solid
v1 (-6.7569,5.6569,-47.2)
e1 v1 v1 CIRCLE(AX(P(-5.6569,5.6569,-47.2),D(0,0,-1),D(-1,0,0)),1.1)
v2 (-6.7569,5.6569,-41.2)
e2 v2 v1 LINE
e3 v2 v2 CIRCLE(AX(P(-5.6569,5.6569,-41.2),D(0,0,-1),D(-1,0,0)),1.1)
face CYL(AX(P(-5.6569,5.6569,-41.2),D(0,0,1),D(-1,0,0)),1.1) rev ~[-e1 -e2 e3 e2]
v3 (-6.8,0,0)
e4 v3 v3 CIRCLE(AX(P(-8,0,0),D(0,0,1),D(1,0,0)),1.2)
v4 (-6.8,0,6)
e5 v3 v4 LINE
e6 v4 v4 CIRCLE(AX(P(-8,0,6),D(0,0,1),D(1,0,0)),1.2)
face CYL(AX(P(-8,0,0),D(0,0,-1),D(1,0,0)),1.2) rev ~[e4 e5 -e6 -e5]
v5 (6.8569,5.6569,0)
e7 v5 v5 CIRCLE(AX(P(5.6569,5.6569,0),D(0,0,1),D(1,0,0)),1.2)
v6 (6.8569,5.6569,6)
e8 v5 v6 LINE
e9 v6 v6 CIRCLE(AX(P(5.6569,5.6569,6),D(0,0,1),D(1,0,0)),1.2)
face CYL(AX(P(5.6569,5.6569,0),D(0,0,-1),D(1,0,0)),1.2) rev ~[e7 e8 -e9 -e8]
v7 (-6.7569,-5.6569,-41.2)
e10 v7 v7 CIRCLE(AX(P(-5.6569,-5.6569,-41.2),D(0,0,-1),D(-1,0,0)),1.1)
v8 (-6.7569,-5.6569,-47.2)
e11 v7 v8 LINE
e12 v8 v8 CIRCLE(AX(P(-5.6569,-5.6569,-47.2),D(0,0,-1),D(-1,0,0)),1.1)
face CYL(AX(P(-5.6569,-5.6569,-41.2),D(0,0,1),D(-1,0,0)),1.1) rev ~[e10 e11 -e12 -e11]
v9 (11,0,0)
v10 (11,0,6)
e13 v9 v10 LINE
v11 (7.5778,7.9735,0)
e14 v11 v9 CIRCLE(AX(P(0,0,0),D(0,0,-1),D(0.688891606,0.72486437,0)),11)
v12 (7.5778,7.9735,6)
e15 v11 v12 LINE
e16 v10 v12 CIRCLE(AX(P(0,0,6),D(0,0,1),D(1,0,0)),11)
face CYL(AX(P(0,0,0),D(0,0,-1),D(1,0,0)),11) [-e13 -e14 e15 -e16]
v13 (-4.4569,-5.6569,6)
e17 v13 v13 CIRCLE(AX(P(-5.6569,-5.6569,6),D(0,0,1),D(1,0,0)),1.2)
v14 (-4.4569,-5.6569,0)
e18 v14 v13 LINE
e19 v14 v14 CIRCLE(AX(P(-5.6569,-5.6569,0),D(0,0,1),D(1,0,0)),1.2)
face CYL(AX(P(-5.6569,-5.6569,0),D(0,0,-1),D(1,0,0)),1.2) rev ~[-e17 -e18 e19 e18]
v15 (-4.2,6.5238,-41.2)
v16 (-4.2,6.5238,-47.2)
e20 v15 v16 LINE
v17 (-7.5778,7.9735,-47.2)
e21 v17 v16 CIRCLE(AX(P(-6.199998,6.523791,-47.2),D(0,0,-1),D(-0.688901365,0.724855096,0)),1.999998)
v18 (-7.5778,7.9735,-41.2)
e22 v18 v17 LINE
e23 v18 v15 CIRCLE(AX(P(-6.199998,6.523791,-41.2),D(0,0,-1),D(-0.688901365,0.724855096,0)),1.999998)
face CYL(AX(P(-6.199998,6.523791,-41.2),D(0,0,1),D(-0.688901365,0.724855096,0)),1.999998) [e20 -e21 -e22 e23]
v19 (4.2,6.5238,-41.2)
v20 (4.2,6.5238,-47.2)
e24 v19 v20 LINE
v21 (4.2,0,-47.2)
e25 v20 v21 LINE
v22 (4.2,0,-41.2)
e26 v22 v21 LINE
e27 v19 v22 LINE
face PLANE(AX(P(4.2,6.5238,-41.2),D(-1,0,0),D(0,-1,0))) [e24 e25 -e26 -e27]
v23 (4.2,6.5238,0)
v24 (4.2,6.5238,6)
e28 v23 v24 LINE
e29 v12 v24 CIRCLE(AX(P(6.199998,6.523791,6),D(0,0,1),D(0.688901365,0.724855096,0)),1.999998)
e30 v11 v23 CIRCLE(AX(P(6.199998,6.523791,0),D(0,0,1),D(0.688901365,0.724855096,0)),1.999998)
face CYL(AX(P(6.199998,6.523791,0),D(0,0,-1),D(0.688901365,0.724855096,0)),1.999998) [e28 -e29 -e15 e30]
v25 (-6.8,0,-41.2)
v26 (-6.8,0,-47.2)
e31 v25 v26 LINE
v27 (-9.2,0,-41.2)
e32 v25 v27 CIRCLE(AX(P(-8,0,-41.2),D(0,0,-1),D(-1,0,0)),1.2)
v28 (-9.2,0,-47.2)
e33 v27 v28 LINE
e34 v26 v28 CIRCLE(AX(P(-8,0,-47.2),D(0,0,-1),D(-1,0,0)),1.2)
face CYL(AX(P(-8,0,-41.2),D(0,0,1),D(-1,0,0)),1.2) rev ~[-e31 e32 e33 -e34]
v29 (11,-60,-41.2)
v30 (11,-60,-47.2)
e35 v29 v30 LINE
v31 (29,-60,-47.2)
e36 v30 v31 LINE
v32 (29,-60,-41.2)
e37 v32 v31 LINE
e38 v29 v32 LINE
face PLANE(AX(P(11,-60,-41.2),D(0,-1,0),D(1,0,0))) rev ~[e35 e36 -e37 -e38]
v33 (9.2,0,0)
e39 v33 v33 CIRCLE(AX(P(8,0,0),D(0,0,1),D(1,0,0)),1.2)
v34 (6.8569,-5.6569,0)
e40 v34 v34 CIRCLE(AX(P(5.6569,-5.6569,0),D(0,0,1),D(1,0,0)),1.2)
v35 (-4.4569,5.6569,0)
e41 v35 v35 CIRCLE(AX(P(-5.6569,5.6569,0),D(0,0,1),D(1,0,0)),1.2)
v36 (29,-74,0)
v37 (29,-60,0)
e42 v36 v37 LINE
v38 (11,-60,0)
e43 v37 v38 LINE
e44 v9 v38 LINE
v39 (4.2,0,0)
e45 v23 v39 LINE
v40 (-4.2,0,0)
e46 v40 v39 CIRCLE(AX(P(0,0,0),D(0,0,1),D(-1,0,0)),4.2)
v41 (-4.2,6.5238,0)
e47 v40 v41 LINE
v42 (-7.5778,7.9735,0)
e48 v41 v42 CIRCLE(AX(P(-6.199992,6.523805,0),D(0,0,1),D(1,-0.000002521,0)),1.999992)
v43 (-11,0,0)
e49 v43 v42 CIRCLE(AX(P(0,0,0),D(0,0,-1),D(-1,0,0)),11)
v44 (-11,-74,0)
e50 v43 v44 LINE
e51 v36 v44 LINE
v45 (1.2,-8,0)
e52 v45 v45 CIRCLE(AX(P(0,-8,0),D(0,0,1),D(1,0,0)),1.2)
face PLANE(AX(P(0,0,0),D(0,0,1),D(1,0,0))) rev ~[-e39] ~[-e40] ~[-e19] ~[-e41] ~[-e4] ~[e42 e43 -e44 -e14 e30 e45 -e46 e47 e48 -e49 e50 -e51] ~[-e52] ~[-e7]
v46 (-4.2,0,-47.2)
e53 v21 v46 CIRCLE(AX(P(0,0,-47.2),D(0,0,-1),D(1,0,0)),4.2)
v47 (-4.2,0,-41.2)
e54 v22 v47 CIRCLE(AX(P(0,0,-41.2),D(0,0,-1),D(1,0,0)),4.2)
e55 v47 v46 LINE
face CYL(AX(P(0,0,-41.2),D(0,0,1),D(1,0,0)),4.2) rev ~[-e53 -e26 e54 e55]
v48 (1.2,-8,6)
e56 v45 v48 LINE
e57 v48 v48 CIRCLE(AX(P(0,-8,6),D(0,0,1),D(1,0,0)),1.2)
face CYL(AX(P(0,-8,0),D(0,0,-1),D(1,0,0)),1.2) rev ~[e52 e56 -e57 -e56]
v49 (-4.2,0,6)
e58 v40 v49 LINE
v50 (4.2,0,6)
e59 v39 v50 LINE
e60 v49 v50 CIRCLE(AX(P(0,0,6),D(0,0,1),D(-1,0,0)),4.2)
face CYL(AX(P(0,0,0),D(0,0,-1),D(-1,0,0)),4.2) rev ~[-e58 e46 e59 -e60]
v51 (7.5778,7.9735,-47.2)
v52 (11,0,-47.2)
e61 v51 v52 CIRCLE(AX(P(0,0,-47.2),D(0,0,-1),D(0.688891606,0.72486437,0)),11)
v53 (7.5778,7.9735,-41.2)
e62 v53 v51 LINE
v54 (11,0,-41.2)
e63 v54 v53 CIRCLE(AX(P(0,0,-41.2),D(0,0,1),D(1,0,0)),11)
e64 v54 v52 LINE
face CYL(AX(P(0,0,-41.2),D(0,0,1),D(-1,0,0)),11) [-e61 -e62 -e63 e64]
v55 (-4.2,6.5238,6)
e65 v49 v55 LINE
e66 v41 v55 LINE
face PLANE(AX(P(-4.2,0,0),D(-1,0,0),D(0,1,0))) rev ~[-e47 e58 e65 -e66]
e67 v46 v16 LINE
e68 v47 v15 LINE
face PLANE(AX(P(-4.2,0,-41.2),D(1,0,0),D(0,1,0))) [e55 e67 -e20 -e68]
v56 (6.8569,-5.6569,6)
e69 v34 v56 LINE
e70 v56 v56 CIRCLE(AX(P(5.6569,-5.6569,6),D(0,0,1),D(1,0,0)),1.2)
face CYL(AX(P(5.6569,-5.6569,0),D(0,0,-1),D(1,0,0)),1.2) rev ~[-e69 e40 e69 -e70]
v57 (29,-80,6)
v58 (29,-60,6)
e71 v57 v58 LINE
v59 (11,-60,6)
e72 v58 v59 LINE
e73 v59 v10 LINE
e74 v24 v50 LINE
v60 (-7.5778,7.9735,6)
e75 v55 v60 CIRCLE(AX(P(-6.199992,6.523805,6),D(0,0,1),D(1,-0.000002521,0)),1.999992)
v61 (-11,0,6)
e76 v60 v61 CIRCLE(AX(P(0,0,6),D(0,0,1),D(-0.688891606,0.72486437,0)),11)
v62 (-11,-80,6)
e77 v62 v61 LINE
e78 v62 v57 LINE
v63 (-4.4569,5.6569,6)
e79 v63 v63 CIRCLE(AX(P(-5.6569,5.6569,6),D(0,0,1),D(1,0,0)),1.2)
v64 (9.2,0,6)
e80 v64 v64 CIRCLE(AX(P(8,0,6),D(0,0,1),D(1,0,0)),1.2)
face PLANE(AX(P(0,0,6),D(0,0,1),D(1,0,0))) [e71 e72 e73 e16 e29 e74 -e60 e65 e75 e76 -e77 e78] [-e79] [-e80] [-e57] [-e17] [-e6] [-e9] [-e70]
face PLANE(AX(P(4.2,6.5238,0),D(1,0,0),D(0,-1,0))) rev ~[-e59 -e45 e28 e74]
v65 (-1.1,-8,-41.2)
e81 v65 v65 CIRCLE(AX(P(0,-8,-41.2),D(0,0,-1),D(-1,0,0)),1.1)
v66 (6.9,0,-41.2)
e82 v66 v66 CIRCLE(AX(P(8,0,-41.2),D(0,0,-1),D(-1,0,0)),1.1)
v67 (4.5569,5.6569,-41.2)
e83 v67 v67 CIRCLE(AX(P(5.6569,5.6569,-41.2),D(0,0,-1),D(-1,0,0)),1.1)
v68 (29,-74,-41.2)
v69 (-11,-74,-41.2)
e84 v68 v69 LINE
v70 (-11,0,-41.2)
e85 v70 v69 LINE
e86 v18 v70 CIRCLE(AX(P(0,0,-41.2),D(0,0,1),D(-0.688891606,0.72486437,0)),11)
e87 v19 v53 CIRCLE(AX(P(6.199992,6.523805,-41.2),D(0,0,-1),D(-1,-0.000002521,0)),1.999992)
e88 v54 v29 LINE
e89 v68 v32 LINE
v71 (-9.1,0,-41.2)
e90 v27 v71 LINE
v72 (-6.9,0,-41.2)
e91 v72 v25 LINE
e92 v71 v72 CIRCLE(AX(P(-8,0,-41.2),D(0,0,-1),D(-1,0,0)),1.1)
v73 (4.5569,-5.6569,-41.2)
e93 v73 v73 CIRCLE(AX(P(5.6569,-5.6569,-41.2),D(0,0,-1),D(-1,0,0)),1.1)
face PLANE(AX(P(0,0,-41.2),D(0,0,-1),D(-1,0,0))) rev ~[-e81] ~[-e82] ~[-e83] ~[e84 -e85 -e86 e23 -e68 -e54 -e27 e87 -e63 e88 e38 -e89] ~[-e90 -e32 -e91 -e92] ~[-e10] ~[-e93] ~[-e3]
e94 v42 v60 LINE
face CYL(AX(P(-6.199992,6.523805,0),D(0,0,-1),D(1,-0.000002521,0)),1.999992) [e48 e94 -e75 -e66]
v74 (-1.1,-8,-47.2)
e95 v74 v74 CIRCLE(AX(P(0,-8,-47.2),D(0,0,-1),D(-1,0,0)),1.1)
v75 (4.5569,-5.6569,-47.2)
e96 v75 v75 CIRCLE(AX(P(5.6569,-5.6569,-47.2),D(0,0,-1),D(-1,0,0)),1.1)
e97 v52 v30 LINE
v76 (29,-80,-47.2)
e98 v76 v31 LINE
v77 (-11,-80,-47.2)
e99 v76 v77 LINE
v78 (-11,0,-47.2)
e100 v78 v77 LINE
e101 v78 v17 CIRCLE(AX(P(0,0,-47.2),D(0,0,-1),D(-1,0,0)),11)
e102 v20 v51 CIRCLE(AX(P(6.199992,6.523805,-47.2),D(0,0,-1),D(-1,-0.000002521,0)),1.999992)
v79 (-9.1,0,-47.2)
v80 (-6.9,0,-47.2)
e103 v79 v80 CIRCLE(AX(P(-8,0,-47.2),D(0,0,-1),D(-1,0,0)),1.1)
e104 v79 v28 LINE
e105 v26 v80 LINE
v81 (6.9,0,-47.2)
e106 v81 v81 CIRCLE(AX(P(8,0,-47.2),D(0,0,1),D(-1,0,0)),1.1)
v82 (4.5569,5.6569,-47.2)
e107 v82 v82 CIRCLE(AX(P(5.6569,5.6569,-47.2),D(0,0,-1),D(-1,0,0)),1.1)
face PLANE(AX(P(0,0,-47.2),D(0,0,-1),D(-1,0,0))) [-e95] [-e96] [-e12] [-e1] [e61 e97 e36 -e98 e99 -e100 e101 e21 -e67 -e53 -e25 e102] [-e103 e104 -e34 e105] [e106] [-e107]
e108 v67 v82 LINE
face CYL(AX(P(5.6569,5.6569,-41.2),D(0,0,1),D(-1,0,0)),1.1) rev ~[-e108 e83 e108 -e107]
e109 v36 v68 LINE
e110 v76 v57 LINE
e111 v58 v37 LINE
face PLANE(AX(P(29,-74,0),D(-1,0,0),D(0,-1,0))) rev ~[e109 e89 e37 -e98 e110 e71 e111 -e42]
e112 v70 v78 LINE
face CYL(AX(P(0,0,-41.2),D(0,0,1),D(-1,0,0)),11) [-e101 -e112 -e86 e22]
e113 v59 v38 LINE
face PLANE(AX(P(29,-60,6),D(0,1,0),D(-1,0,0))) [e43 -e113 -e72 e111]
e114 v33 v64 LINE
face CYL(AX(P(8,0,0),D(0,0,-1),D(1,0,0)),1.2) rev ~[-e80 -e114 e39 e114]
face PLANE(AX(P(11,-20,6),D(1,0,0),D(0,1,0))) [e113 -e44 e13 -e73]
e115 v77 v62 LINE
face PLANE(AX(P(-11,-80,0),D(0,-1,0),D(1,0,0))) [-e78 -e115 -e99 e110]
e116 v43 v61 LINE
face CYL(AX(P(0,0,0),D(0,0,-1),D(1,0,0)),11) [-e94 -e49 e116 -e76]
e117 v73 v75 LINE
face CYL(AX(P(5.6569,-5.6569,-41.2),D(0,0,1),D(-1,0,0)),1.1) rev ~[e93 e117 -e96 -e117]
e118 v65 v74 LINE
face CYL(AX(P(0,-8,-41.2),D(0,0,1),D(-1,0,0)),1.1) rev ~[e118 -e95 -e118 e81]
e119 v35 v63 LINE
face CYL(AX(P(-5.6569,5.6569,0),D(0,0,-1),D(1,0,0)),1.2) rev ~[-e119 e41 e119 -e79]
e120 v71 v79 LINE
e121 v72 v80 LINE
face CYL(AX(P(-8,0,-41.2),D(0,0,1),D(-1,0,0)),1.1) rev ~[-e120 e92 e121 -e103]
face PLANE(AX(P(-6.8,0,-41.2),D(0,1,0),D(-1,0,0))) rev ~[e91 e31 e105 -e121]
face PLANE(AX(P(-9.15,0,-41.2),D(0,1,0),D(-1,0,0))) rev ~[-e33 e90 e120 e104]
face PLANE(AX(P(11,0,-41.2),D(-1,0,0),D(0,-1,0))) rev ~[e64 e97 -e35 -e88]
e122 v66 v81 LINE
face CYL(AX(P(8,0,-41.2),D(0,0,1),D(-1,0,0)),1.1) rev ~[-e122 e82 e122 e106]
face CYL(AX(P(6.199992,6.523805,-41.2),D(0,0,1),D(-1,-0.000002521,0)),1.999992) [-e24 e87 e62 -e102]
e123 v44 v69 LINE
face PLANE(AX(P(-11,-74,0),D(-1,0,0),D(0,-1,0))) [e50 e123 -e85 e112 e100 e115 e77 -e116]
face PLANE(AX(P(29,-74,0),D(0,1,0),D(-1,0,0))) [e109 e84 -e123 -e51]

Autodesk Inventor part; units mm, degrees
ref_plane "YZ Plane" through (0, 0, 0) normal (1, 0, 0) x (0, 1, 0)
ref_plane "XZ Plane" through (0, 0, 0) normal (0, 1, 0) x (-1, 0, 0)
ref_plane "XY Plane" through (0, 0, 0) normal (0, 0, 1) x (1, 0, 0)
sketch "스케치1" plane through (0, 0, 0) normal (0, 0, 1) x (1, 0, 0)
  circle A0 centre (0, 8) radius 1.05 projected
  line L0 (6.1695, 0) -> (-5.6569, 0)
  circle A1 centre (0, 0) radius 11 projected
  line L1 (11, -20) -> (31, -20) projected
  line L2 (11, 0) -> (11, -20) projected
  arc A2 (11, 0) -> (7.5778, 7.9735) centre (0, 0) ccw projected
  arc A3 (-7.5778, 7.9735) -> (-11, 0) centre (0, 0) ccw projected
  line L3 (-11, -40) -> (-11, 0) projected
  line L4 (31, -40) -> (-11, -40) projected
  line L5 (31, -20) -> (31, -40) projected
  circle A4 centre (5.6569, 5.6569) radius 1.2 projected
  circle A5 centre (-8, 0) radius 1.2 projected
  circle A6 centre (-5.6569, 5.6569) radius 1.2 projected
  circle A7 centre (-5.6569, -5.6569) radius 1.2 projected
  circle A8 centre (5.6569, -5.6569) radius 1.2 projected
  circle A9 centre (0, -8) radius 1.2 projected
  circle A10 centre (8, 0) radius 1.2 projected
  arc A11 (-10.0222, 4.5338) -> (10.0222, 4.5338) centre (0, 0) ccw
  arc A12 (-4.2, 0) -> (4.2, 0) centre (0, 0) ccw
  line L6 (4.2, 0) -> (-4.2, 0)
  line L7 (-4.2, 0) -> (-4.2, 6.5238)
  line L8 (-4.2, 13.5959) -> (4.2, 13.5959)
  line L9 (4.2, 6.5238) -> (4.2, 0)
  arc A13 (-7.5778, 7.9735) -> (7.5778, 7.9735) centre (0, 0) ccw
  arc A14 (7.5778, 7.9735) -> (4.2, 6.5238) centre (6.2, 6.5238) ccw
  arc A15 (-4.2, 6.5238) -> (-7.5778, 7.9735) centre (-6.2, 6.5238) ccw
  point P0 (-6.2, 0)
  point P1 (4.2, 10.1666)
  point P2 (-4.2, 10.1666)
  point P3 (-7.5778, 7.9735)
  point P4 (7.5778, 7.9735)
  dimension "d20" = 2
extrude "돌출1" add sketch "스케치1" along normal blind 6 contours L9 A14 A1 A15 L7 A12
sketch "스케치3" plane through (0, 0, 6) normal (0, 0, 1) x (1, 0, 0)
  line L0 (31, -40) -> (31, -20) projected
  line L1 (11, -20) -> (31, -20)
  line L2 (31, -20) -> (31, -40)
  line L3 (31, -40) -> (11, -40)
  line L4 (11, -40) -> (11, -20)
  arc A0 (-7.5778, 7.9735) -> (7.5778, 7.9735) centre (0, 0) ccw projected
  circle A1 centre (-8, 0) radius 1.2 projected
  circle A2 centre (-5.6569, -5.6569) radius 1.2 projected
  circle A3 centre (5.6569, -5.6569) radius 1.2 projected
  circle A4 centre (0, -8) radius 1.2 projected
  circle A5 centre (8, 0) radius 1.2 projected
  line L5 (11, -40) -> (-11, -40)
  line L6 (-11, -40) -> (-11, -80)
  line L7 (-11, -80) -> (11, -80)
  line L8 (11, -80) -> (11, -40)
  line L9 (-11, -80) -> (29, -80)
  line L10 (29, -80) -> (29, -60)
  line L11 (29, -60) -> (-11, -60)
  line L12 (-11, -60) -> (-11, -80)
  line L13 (-11, -40) -> (11, -40)
  line L14 (11, -40) -> (11, 0)
  line L15 (11, 0) -> (-11, 0)
  line L16 (-11, 0) -> (-11, -40)
  arc A6 (7.5778, 7.9735) -> (4.2, 6.5238) centre (6.2, 6.5238) ccw projected
  line L17 (4.2, 6.5238) -> (4.2, 0) projected
  arc A7 (-4.2, 0) -> (4.2, 0) centre (0, 0) ccw projected
  line L18 (-4.2, 0) -> (-4.2, 6.5238) projected
  arc A8 (-4.2, 6.5238) -> (-7.5778, 7.9735) centre (-6.2, 6.5238) ccw projected
  point P0 (11, -60)
  dimension "d4" = 40
extrude "돌출2" add sketch "스케치3" against normal blind 6 contours L5 L16 A0 L14 L4 | L8 L11 L6 L5 | L11 L10 L9 L8 | L8 L7 L6 L11
sketch "스케치4" plane through (0, 0, 0) normal (0, 0, -1) x (-1, 0, 0)
  line L0 (11, 0) -> (11, -80) projected
  line L1 (-29, -60) -> (-29, -80) projected
  line L2 (11, -80) -> (-29, -80)
  line L3 (-29, -80) -> (-29, -60)
  line L4 (-29, -60) -> (11, -60)
  line L5 (11, -60) -> (11, -80)
  line L6 (11, -80) -> (-29, -80)
  line L7 (-29, -80) -> (-29, -74)
  line L8 (-29, -74) -> (11, -74)
  line L9 (11, -74) -> (11, -80)
  point P0 (0, 0)
  dimension "d7" = 6
extrude "돌출3" add sketch "스케치4" along normal blind 41.2 contours L0 L2 L1 L8
sketch "스케치5" plane through (0, 0, -41.2) normal (0, 0, -1) x (-1, 0, 0)
  circle A0 centre (0, 0) radius 11 projected
  circle A1 centre (5.6569, -5.6569) radius 1.15
  circle A2 centre (8, 0) radius 1.15
  circle A3 centre (5.6569, 5.6569) radius 1.15
  circle A4 centre (0, 8) radius 1.15
  circle A5 centre (-5.6569, 5.6569) radius 1.15
  circle A6 centre (-8, 0) radius 1.15
  circle A7 centre (-5.6569, -5.6569) radius 1.15
  circle A8 centre (0, -8) radius 1.15
  line L0 (-11, 0) -> (-11, -60) projected
  line L1 (11, 0) -> (11, -80) projected
  line L2 (-11, 0) -> (11, 0)
  line L3 (11, 0) -> (11, -80)
  line L4 (11, -80) -> (-11, -80)
  line L5 (-11, -80) -> (-11, 0)
  line L6 (-29, -80) -> (-29, -60) projected
  line L7 (-29, -80) -> (-11, -80)
  line L8 (-11, -80) -> (-11, -60)
  line L9 (-11, -60) -> (-29, -60)
  line L10 (-29, -60) -> (-29, -80)
  line L11 (6.2, 0) -> (-6.2, 0)
  line L12 (-6.2, 15) -> (6.2, 15)
  arc A9 (-10.0222, 4.5338) -> (10.0222, 4.5338) centre (0, 0) ccw
  arc A10 (11, 0) -> (7.5778, 7.9735) centre (0, 0) ccw projected
  line L13 (11, 0) -> (11, -80) projected
  line L14 (11, -80) -> (-29, -80) projected
  line L15 (-29, -80) -> (-29, -60) projected
  line L16 (-29, -60) -> (-11, -60) projected
  line L17 (-11, -60) -> (-11, 0) projected
  arc A11 (-7.5778, 7.9735) -> (-11, 0) centre (0, 0) ccw projected
  arc A12 (-4.2, 6.5238) -> (-7.5778, 7.9735) centre (-6.2, 6.5238) ccw projected
  line L18 (-4.2, 6.5238) -> (-4.2, 0) projected
  arc A13 (-4.2, 0) -> (4.2, 0) centre (0, 0) ccw projected
  line L19 (4.2, 0) -> (4.2, 6.5238) projected
  arc A14 (7.5778, 7.9735) -> (4.2, 6.5238) centre (6.2, 6.5238) ccw projected
  circle A15 centre (-8, 0) radius 1.2 projected
  circle A16 centre (0, -8) radius 1.2 projected
  circle A17 centre (-5.6569, -5.6569) radius 1.2 projected
  circle A18 centre (5.6569, -5.6569) radius 1.2 projected
  circle A19 centre (5.6569, 5.6569) radius 1.2 projected
  circle A20 centre (8, 0) radius 1.2 projected
  circle A21 centre (-5.6569, 5.6569) radius 1.2 projected
  circle A22 centre (5.6569, 5.6569) radius 1.1
  circle A23 centre (0, 8) radius 1.1
  circle A24 centre (-5.6569, 5.6569) radius 1.1
  circle A25 centre (-8, 0) radius 1.1
  circle A26 centre (-5.6569, -5.6569) radius 1.1
  circle A27 centre (0, -8) radius 1.1
  circle A28 centre (5.6569, -5.6569) radius 1.1
  circle A29 centre (8, 0) radius 1.1
  point P0 (0, 0)
  point P1 (6.2, 9.0863)
  point P2 (-6.2, 9.0863)
  point P3 (11, 0)
  point P4 (9.2, 0)
  point P5 (6.8, 0)
  point P6 (6.85, 0)
  point P7 (9.15, 0)
  point P8 (7.5778, 7.9735)
  point P9 (-7.5778, 7.9735)
  point P10 (6.9, 0)
  point P11 (9.1, 0)
  point P12 (-6.9, 0)
  point P13 (-9.1, 0)
  point P14 (-9.15, 0)
  point P15 (-6.85, 0)
  dimension "d13" = 360
  dimension "d21" = 2.2
  dimension "d24" = 360
extrude "돌출4" add sketch "스케치5" along normal blind 6 contours L2 A20 L19 A14 A0 | L1 L4 L5 L0 A0 | A0 L2 A15 A13 A20 | A0 A12 L18 L2 A15 | L2 A2 A20 | L5 L7 L6 L9 | A15 L2 A6 | L2 A6 A15 | L2 A29 A2 | L2 A25 A6 | A6 L2 A25 | A1 | A3 | A5 | A7 | A8 | A16 | A17 | A18 | A19 | A21 picked at (7.9538, 1.1747) picked at (6.8885, 0.1795)
properties part number "부품56" material "PMMA 플라스틱"
